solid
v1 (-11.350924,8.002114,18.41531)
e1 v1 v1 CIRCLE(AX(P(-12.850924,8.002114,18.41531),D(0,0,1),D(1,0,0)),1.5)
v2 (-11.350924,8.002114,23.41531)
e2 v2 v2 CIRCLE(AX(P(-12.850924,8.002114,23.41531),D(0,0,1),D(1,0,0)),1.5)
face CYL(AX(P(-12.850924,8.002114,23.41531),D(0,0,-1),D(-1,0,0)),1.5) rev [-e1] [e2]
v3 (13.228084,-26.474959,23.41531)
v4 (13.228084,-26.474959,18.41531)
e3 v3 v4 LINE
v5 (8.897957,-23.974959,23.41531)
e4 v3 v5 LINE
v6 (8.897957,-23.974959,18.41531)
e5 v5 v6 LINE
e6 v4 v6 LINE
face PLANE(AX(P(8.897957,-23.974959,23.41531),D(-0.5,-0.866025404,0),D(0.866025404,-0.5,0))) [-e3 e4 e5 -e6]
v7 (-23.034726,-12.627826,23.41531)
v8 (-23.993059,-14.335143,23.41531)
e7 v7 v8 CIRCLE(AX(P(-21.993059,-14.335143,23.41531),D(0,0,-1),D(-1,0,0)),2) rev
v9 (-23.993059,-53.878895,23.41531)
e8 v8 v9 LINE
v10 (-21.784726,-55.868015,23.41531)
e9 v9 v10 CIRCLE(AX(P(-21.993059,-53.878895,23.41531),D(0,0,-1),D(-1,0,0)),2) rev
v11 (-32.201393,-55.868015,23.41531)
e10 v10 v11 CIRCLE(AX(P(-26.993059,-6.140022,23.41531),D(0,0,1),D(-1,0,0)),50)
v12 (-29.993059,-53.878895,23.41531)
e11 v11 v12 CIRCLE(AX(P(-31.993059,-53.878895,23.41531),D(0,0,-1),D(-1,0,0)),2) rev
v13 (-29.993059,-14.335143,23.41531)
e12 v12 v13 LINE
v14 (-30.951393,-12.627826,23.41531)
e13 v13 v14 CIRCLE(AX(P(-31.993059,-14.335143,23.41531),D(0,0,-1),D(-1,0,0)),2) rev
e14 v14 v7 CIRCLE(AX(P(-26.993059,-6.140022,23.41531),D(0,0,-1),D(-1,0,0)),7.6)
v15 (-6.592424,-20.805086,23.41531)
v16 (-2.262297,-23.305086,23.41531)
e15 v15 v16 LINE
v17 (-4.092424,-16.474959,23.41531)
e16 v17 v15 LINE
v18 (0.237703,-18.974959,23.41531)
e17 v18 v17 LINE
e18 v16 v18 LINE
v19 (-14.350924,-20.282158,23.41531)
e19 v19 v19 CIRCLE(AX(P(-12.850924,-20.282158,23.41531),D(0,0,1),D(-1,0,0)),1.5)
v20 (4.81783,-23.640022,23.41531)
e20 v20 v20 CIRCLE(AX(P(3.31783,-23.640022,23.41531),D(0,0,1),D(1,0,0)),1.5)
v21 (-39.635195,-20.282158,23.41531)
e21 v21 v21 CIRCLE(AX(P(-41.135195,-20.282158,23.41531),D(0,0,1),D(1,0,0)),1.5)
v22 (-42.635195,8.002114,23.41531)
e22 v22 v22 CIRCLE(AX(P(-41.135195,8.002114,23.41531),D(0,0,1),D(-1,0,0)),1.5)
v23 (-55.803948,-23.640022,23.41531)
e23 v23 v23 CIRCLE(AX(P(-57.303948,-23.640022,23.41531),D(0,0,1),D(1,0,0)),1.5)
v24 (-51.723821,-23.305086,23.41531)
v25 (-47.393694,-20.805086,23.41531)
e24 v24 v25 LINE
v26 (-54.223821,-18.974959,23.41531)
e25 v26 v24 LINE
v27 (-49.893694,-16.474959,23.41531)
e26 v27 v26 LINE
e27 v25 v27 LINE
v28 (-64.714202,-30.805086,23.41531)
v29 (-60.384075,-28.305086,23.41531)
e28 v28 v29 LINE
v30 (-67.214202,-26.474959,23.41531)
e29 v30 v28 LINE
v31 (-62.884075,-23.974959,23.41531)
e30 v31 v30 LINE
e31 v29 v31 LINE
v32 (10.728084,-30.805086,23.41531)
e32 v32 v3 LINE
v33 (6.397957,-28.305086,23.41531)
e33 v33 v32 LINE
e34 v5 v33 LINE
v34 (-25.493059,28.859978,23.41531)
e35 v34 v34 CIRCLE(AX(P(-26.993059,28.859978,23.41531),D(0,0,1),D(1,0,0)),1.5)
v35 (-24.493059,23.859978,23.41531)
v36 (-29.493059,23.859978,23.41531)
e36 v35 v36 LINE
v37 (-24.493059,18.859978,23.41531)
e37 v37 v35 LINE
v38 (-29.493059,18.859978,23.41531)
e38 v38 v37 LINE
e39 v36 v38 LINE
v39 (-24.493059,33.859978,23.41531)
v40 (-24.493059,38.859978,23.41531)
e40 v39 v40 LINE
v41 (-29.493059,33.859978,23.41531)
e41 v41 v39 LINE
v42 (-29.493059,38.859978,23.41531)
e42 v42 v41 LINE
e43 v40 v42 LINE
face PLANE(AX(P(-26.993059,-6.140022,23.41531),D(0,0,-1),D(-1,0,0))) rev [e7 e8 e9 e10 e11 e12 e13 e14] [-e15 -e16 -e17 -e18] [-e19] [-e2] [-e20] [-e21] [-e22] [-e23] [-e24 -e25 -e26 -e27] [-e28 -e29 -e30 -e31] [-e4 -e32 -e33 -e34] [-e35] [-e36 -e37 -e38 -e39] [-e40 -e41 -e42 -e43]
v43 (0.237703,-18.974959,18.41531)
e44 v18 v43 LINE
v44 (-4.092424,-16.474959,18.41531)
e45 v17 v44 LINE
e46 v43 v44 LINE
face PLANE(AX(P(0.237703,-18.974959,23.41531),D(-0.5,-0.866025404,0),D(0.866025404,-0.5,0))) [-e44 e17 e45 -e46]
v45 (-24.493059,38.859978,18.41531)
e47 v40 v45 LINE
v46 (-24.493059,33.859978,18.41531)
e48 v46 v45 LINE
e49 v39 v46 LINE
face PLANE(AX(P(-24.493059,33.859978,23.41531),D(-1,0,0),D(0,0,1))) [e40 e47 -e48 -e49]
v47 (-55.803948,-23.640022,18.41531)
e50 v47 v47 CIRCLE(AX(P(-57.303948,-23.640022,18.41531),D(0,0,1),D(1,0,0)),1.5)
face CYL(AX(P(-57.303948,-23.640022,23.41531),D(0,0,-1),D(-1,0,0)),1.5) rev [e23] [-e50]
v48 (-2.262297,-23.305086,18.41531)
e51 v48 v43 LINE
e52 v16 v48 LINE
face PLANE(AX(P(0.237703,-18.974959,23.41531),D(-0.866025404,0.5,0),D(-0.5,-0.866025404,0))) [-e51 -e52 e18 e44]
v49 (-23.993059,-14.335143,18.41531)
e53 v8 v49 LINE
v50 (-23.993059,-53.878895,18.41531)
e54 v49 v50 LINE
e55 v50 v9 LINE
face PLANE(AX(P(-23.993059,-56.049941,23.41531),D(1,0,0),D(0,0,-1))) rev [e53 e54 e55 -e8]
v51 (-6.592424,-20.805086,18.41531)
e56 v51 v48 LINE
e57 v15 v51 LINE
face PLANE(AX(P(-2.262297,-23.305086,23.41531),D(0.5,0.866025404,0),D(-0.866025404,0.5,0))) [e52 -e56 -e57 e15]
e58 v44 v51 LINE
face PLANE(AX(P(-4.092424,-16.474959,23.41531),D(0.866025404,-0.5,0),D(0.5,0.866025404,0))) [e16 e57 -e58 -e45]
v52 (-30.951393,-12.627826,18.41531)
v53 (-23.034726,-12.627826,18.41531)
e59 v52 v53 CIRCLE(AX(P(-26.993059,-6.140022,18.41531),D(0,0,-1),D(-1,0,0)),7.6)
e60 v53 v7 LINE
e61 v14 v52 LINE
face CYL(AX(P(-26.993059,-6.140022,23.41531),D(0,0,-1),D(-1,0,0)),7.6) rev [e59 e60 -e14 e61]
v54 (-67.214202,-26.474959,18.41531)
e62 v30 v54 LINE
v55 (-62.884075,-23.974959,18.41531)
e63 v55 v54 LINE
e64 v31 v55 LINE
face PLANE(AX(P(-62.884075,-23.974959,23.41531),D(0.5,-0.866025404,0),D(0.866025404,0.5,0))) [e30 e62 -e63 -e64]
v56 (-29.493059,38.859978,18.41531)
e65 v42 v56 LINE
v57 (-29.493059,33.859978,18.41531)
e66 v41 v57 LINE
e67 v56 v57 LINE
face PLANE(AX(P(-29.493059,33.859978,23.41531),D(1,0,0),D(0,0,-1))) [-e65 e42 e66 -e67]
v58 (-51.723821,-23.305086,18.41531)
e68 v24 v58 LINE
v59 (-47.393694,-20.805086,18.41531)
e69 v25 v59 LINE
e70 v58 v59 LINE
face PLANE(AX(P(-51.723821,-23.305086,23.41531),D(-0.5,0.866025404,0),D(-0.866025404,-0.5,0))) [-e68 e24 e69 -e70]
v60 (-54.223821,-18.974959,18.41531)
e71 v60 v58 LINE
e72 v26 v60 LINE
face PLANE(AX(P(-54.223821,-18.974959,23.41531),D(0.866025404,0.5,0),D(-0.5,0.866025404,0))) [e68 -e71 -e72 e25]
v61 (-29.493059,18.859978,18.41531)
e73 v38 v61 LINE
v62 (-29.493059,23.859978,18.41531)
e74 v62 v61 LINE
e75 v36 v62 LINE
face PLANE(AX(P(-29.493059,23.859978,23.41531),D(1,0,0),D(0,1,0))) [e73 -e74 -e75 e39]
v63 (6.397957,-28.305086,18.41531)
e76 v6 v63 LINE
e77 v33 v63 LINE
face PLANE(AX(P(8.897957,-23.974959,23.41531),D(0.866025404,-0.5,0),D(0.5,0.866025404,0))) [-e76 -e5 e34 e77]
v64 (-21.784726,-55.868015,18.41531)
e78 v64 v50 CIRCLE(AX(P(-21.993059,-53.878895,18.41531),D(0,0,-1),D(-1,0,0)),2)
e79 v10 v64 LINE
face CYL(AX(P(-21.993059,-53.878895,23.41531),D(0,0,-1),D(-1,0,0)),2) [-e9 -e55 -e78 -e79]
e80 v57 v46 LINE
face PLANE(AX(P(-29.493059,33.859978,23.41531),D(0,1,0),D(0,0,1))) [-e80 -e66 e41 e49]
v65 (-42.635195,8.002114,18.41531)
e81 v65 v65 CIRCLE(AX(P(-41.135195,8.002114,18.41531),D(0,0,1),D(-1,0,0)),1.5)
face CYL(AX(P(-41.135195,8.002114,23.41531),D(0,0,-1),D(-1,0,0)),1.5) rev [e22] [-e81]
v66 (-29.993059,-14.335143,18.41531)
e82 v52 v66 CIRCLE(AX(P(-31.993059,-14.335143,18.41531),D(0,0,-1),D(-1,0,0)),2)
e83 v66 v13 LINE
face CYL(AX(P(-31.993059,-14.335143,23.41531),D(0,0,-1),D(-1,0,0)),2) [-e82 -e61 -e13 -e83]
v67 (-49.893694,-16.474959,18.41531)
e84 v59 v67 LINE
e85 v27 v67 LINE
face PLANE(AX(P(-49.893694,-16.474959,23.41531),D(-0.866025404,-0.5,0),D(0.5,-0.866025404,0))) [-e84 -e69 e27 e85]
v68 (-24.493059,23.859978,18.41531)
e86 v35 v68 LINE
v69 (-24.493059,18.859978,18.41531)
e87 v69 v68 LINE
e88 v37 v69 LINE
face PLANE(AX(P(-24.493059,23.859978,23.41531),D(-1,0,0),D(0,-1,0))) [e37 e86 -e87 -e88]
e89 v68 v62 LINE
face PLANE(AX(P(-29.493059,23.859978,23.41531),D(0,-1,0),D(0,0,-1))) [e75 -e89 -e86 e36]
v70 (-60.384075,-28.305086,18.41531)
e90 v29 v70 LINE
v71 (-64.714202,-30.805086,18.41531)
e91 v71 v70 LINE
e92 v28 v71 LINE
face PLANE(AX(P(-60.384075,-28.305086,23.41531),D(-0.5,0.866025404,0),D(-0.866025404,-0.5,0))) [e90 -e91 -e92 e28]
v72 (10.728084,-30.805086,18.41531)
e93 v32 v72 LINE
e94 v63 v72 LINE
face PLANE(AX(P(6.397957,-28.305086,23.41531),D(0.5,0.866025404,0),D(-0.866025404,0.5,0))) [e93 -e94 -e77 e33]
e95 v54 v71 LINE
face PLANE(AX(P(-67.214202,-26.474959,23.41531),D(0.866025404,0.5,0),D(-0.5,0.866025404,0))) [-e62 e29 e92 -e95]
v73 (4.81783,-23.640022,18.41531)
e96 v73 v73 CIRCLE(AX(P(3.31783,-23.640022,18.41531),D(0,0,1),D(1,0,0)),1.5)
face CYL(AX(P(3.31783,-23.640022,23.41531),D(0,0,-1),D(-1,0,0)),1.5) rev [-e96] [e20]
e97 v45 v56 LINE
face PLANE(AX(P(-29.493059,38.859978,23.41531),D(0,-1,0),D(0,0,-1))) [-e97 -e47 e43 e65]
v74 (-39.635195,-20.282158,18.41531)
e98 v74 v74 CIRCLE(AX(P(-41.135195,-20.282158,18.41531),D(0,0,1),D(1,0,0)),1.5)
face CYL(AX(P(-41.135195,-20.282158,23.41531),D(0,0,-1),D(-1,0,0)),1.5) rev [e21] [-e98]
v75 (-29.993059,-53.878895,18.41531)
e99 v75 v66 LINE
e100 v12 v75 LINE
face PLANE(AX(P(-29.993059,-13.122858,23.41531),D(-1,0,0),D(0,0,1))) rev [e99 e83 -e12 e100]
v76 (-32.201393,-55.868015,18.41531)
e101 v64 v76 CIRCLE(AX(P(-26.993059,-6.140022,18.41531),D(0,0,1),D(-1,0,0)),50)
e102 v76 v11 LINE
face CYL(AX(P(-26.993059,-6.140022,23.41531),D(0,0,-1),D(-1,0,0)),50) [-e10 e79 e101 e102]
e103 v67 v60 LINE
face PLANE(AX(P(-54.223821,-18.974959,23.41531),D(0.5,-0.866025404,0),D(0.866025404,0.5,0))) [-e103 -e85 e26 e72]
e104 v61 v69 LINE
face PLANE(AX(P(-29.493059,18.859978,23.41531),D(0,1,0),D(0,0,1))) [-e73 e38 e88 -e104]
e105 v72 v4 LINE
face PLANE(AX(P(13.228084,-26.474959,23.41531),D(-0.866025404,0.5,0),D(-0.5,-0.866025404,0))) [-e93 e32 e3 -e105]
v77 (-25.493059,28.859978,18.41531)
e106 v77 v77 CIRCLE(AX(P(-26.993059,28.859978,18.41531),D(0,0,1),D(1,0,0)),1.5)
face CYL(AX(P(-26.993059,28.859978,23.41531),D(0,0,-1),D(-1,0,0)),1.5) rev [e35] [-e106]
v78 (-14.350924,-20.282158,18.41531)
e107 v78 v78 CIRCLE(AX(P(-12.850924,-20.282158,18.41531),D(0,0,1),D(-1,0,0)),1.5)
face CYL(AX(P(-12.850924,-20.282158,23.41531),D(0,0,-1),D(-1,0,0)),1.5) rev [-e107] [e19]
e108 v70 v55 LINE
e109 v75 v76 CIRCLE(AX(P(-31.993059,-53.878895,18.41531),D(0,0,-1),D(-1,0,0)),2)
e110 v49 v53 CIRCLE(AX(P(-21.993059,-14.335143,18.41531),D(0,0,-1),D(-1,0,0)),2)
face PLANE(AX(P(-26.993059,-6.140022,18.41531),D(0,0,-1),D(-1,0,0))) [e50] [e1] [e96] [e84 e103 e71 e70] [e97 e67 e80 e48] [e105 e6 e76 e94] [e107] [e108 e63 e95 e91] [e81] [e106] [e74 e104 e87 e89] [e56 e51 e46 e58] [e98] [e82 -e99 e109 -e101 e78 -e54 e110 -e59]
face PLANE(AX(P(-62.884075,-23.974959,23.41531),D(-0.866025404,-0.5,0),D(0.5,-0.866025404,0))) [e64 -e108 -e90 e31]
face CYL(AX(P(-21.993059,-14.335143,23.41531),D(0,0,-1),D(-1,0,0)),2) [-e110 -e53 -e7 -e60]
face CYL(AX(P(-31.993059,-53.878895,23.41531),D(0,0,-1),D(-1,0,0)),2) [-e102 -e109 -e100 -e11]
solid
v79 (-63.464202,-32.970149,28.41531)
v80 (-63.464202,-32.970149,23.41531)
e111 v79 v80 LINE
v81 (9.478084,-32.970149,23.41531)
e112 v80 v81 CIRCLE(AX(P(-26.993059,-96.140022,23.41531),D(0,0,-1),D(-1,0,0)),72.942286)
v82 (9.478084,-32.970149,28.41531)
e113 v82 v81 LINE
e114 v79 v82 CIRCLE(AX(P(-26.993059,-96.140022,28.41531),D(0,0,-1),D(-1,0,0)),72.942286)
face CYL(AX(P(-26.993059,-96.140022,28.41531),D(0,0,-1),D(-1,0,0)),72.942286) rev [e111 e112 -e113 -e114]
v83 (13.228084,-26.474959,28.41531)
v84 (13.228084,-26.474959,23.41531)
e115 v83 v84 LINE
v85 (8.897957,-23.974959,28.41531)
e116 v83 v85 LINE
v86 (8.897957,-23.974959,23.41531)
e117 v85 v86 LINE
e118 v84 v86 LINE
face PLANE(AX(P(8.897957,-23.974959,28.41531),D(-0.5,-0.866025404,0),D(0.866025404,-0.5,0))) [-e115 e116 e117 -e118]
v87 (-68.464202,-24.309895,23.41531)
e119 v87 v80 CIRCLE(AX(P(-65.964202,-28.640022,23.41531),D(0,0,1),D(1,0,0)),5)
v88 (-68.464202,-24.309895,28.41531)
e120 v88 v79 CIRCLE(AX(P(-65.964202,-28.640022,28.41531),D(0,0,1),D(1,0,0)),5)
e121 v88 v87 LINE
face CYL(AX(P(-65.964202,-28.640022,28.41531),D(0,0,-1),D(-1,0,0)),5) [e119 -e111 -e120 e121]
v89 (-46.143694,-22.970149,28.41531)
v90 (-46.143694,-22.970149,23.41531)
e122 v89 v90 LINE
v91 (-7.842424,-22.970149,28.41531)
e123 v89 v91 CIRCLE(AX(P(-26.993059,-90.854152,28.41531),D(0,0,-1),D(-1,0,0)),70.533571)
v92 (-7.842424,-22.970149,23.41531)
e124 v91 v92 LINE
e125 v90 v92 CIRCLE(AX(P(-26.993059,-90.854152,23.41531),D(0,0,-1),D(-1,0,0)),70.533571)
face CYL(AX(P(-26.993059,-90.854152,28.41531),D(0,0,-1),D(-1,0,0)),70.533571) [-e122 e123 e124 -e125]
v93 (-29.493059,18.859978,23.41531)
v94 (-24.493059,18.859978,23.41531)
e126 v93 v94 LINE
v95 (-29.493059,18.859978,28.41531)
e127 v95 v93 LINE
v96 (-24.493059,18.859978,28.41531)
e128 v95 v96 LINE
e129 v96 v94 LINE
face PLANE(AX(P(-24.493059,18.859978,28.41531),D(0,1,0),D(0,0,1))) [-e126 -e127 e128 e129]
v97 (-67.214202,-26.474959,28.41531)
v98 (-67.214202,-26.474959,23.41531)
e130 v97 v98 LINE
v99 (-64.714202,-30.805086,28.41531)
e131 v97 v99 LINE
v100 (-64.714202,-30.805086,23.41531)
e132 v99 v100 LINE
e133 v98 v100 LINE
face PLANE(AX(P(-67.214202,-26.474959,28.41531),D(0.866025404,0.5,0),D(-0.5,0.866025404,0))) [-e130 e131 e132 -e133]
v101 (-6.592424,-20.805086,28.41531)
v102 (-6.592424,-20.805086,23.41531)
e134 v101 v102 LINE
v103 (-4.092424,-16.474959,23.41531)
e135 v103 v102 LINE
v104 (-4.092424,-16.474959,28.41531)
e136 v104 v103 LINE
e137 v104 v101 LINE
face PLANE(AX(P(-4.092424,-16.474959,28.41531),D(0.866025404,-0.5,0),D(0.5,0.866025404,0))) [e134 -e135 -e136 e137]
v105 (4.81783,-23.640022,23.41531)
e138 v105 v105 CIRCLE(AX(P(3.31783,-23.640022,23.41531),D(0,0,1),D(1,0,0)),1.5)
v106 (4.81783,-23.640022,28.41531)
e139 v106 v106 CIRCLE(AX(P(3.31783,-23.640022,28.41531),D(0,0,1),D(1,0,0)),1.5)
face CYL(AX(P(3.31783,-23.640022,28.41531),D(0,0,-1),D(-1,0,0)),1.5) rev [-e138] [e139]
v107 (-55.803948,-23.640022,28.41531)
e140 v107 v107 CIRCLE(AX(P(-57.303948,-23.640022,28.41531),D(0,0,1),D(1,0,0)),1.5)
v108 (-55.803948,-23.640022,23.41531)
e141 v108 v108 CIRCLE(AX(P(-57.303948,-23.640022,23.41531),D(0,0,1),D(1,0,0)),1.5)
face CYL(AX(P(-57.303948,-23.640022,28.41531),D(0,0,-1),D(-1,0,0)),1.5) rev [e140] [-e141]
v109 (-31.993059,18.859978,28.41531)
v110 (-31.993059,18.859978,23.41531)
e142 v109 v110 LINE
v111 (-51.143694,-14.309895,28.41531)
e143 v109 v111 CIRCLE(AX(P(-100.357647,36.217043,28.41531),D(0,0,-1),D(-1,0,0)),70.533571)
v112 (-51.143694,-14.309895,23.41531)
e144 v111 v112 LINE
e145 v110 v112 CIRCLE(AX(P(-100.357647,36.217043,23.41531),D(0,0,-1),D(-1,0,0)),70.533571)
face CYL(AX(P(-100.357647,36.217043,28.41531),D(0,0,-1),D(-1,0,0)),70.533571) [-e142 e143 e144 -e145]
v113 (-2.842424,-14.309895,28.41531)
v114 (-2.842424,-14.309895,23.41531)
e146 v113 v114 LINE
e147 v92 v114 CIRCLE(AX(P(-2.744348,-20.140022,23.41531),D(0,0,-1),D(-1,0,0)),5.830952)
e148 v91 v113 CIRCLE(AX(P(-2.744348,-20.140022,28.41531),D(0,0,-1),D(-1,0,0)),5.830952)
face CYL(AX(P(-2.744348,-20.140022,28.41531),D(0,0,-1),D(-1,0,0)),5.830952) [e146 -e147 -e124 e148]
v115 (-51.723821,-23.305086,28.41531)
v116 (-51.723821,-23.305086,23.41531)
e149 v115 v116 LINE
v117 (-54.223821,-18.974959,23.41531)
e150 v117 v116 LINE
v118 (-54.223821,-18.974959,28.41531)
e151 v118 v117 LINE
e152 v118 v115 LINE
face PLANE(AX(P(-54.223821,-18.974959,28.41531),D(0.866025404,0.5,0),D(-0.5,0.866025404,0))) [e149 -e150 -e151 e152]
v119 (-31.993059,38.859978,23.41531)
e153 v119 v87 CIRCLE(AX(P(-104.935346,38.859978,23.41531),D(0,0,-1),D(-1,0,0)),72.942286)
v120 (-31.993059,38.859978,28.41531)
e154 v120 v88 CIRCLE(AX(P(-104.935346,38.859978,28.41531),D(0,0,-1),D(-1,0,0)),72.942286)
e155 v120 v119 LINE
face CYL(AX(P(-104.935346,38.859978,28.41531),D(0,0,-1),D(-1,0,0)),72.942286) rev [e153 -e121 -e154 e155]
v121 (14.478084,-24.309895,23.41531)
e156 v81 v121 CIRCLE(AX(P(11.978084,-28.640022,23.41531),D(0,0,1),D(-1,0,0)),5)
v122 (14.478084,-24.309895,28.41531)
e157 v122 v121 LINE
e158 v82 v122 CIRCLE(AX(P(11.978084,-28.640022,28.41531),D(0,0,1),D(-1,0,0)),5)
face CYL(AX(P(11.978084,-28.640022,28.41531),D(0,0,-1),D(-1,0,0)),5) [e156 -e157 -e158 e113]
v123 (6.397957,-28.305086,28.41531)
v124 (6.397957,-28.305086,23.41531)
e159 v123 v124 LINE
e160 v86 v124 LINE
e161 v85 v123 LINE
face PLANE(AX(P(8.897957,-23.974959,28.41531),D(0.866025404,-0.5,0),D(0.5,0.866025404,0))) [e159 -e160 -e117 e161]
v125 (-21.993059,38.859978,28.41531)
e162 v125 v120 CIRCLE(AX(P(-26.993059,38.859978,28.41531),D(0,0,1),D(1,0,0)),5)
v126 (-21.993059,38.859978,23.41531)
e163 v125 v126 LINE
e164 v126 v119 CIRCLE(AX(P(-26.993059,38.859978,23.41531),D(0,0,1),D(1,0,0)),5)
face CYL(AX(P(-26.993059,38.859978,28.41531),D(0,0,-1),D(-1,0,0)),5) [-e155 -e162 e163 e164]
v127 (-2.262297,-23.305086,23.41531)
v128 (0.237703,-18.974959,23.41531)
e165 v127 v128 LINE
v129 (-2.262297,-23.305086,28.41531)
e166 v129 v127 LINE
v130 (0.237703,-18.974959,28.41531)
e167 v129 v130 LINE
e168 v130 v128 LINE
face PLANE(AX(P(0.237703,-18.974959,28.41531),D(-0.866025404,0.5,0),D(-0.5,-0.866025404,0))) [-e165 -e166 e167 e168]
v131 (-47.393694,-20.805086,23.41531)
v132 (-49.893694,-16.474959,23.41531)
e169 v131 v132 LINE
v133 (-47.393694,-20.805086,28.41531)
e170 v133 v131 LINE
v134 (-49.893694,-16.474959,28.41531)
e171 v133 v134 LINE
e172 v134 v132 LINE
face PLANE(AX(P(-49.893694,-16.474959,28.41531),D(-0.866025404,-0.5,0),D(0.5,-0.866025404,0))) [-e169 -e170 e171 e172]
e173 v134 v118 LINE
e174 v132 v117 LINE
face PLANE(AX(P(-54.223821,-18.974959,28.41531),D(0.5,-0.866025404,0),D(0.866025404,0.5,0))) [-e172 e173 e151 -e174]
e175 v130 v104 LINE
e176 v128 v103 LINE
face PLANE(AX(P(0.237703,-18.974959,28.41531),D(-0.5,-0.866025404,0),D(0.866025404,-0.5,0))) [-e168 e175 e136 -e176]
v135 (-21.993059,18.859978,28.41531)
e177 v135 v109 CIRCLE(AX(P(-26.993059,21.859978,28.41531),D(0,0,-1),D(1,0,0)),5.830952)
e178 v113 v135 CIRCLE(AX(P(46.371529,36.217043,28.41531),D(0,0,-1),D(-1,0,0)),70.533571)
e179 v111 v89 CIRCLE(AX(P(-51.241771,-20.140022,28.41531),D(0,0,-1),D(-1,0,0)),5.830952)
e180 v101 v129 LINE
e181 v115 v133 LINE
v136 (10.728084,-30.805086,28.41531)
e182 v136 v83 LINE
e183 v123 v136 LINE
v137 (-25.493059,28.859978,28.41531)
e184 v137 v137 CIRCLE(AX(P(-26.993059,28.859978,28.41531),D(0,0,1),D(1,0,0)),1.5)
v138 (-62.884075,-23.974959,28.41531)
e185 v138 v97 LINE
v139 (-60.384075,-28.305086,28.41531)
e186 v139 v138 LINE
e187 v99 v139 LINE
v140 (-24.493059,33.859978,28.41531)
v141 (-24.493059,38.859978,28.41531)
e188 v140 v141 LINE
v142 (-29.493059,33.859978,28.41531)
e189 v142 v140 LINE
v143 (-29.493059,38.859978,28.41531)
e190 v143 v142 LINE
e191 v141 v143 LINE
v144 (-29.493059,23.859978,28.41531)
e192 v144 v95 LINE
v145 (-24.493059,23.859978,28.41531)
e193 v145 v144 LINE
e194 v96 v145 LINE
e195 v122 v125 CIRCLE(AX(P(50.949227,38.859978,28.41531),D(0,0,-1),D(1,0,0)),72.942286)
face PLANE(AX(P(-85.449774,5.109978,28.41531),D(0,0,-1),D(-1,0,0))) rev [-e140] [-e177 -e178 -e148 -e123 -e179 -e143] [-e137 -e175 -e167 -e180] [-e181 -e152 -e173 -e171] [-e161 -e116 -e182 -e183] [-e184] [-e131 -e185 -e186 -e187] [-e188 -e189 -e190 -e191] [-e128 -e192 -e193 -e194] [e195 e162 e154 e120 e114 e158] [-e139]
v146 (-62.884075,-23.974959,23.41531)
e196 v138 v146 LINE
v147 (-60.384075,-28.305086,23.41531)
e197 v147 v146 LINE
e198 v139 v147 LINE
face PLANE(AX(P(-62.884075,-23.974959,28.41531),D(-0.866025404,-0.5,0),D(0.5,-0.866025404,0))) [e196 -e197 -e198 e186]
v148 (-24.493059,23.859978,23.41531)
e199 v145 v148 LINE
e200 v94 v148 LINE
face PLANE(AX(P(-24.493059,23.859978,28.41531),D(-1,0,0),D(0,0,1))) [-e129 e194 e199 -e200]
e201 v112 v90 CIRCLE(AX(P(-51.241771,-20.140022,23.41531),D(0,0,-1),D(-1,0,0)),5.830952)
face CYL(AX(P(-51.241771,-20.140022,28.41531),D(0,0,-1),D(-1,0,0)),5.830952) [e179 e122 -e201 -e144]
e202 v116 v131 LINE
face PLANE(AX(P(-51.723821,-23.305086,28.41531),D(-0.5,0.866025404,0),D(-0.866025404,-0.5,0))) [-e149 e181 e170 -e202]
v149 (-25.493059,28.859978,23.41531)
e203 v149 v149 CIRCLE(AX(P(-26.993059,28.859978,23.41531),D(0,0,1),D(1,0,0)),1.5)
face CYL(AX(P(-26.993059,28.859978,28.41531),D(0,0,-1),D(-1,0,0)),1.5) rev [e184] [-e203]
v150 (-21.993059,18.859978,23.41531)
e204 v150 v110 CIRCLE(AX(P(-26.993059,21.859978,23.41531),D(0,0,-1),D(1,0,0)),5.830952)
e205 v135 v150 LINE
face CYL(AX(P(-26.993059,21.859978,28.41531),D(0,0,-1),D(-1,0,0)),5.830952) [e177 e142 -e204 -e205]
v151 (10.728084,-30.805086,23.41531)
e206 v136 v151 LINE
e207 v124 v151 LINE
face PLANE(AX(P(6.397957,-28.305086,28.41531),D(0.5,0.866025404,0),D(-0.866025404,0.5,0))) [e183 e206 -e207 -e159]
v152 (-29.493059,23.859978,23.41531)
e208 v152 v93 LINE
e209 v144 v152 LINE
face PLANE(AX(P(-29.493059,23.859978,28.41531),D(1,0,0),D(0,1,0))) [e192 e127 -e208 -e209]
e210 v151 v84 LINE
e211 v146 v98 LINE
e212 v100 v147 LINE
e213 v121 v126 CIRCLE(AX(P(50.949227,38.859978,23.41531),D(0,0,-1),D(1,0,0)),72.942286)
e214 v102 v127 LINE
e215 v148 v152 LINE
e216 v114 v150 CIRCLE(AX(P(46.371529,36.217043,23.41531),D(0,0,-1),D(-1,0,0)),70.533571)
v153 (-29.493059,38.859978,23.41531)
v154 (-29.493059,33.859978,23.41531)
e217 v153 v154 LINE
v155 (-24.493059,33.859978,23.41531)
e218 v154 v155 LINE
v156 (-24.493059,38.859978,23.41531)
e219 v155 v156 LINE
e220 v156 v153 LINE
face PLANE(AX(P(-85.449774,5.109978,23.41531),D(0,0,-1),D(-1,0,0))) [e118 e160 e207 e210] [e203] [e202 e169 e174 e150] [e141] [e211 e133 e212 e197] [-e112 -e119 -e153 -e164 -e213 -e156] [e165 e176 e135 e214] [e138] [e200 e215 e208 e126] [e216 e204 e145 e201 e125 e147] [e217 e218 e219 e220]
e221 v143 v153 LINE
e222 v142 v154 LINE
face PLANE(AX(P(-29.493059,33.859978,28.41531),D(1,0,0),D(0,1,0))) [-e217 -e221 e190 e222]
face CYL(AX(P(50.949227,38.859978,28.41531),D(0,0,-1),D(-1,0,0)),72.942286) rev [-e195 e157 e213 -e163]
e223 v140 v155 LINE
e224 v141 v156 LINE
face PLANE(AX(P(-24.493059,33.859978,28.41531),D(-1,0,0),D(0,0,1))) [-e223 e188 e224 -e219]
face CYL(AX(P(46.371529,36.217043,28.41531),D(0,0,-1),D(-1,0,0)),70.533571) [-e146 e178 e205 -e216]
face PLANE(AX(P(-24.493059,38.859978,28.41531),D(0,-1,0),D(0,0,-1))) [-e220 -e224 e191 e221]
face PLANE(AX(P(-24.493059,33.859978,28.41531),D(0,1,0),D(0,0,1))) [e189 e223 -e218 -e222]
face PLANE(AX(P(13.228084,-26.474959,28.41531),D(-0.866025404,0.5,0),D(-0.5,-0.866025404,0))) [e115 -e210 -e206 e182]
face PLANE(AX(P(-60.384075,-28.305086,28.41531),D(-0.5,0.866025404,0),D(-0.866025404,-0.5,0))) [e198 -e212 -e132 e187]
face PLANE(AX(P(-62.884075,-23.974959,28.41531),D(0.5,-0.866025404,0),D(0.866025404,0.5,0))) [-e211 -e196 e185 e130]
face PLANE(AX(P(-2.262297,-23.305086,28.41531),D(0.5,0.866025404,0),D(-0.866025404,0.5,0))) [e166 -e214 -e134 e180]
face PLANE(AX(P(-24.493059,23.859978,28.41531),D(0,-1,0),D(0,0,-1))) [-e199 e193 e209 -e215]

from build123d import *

# Parameters (mm, degrees)
BODY_MOVE_COPY2_START     = 18.4153099
BODY_MOVE_COPY2_OUTLINE_R = 1.5
BODY_MOVE_COPY2_OUTLINE_W = 5
BODY_MOVE_COPY2_OUTLINE_H = 5
BODY_MOVE_COPY2_DEPTH     = 5
SKETCH2_R                 = 1.5
SKETCH2_W                 = 5
SKETCH2_H                 = 5
BOSS_EXTRUDE1_DEPTH       = 5


# Read off the part's stored shape, not the designer's step: Body-Move/Copy2
with BuildPart() as part:
    # Body-Move/Copy2 outline → Body-Move/Copy2 (new body)
    with BuildSketch(Plane.XY.offset(BODY_MOVE_COPY2_START)):
        with BuildLine():
            ThreePointArc((-29.993059319, -14.335142591), (-30.249021858, -13.35619758), (-30.951392653, -12.62782582))
            ThreePointArc((-30.951392653, -12.62782582), (-26.993059319, 1.459977909), (-23.034725986, -12.62782582))
            ThreePointArc((-23.034725986, -12.62782582), (-23.737096781, -13.35619758), (-23.993059319, -14.335142591))
            Line((-23.993059319, -14.335142591), (-23.993059319, -53.87889514))
            ThreePointArc((-23.993059319, -53.87889514), (-23.331590853, -55.364941349), (-21.784725986, -55.868014851))
            ThreePointArc((-21.784725986, -55.868014851), (-26.993059319, 43.859977909), (-32.201392653, -55.868014851))
            ThreePointArc((-32.201392653, -55.868014851), (-30.654527786, -55.364941349), (-29.993059319, -53.87889514))
            Line((-29.993059319, -53.87889514), (-29.993059319, -14.335142591))
        make_face()
        Polygon((-67.21420249, -26.474958582), (-62.884075471, -23.974958582), (-60.384075471, -28.305085601), (-64.71420249, -30.805085601), align=None, mode=Mode.SUBTRACT)
        with Locations((-57.303948452, -23.640022091)):
            Circle(BODY_MOVE_COPY2_OUTLINE_R, mode=Mode.SUBTRACT)
        Polygon((-47.393694414, -20.805085601), (-51.723821433, -23.305085601), (-54.223821433, -18.974958582), (-49.893694414, -16.474958582), align=None, mode=Mode.SUBTRACT)
        with Locations((-41.135194943, -20.282157715)):
            Circle(BODY_MOVE_COPY2_OUTLINE_R, mode=Mode.SUBTRACT)
        with Locations((-12.850923696, -20.282157715)):
            Circle(BODY_MOVE_COPY2_OUTLINE_R, mode=Mode.SUBTRACT)
        Polygon((-4.092424225, -16.474958582), (0.237702794, -18.974958582), (-2.262297206, -23.305085601), (-6.592424225, -20.805085601), align=None, mode=Mode.SUBTRACT)
        Polygon((10.728083851, -30.805085601), (6.397956832, -28.305085601), (8.897956832, -23.974958582), (13.228083851, -26.474958582), align=None, mode=Mode.SUBTRACT)
        with Locations((3.317829813, -23.640022091)):
            Circle(BODY_MOVE_COPY2_OUTLINE_R, mode=Mode.SUBTRACT)
        with Locations((-41.135194943, 8.002113533)):
            Circle(BODY_MOVE_COPY2_OUTLINE_R, mode=Mode.SUBTRACT)
        with Locations((-12.850923696, 8.002113533)):
            Circle(BODY_MOVE_COPY2_OUTLINE_R, mode=Mode.SUBTRACT)
        with Locations((-26.993059319, 21.359977909)):
            Rectangle(BODY_MOVE_COPY2_OUTLINE_W, BODY_MOVE_COPY2_OUTLINE_H, mode=Mode.SUBTRACT)
        with Locations((-26.993059319, 28.859977909)):
            Circle(BODY_MOVE_COPY2_OUTLINE_R, mode=Mode.SUBTRACT)
        with Locations((-26.993059319, 36.359977909)):
            Rectangle(BODY_MOVE_COPY2_OUTLINE_W, BODY_MOVE_COPY2_OUTLINE_H, mode=Mode.SUBTRACT)
    extrude(amount=BODY_MOVE_COPY2_DEPTH)


with BuildPart() as body_2:
    # Sketch2 → Boss-Extrude1 (new body)
    with BuildSketch(Plane.XY.offset(23.4153099)):
        with BuildLine():
            ThreePointArc((-68.46420249, -24.309895072), (-70.294329509, -31.140022091), (-63.46420249, -32.97014911))
            ThreePointArc((-63.46420249, -32.97014911), (-26.993059319, -23.197735751), (9.478083851, -32.97014911))
            ThreePointArc((9.478083851, -32.97014911), (16.30821087, -31.140022091), (14.478083851, -24.309895072))
            ThreePointArc((14.478083851, -24.309895072), (-12.22064596, 2.388834739), (-21.993059319, 38.859977909))
            ThreePointArc((-21.993059319, 38.859977909), (-26.993059319, 43.859977909), (-31.993059319, 38.859977909))
            ThreePointArc((-31.993059319, 38.859977909), (-41.765472679, 2.388834739), (-68.46420249, -24.309895072))
        make_face()
        with Locations((-26.993059319, 28.859977909)):
            Circle(SKETCH2_R, mode=Mode.SUBTRACT)
        with Locations((3.317829813, -23.640022091)):
            Circle(SKETCH2_R, mode=Mode.SUBTRACT)
        with Locations((-57.303948452, -23.640022091)):
            Circle(SKETCH2_R, mode=Mode.SUBTRACT)
        with BuildLine():
            ThreePointArc((-46.143694414, -22.97014911), (-26.993059319, -20.320580734), (-7.842424225, -22.97014911))
            ThreePointArc((-7.842424225, -22.97014911), (-7.794100483, -17.224546144), (-2.842424225, -14.309895072))
            ThreePointArc((-2.842424225, -14.309895072), (-14.712335295, 0.95025723), (-21.993059319, 18.859977909))
            ThreePointArc((-21.993059319, 18.859977909), (-26.993059319, 16.029026014), (-31.993059319, 18.859977909))
            ThreePointArc((-31.993059319, 18.859977909), (-39.273783344, 0.95025723), (-51.143694414, -14.309895072))
            ThreePointArc((-51.143694414, -14.309895072), (-46.192018156, -17.224546144), (-46.143694414, -22.97014911))
        make_face(mode=Mode.SUBTRACT)
        with Locations((-26.993059319, 36.359977909)):
            Rectangle(SKETCH2_W, SKETCH2_H, mode=Mode.SUBTRACT)
        with Locations((-26.993059319, 21.359977909)):
            Rectangle(SKETCH2_W, SKETCH2_H, mode=Mode.SUBTRACT)
        Polygon((0.237702794, -18.974958582), (-4.092424225, -16.474958582), (-6.592424225, -20.805085601), (-2.262297206, -23.305085601), align=None, mode=Mode.SUBTRACT)
        Polygon((8.897956832, -23.974958582), (13.228083851, -26.474958582), (10.728083851, -30.805085601), (6.397956832, -28.305085601), align=None, mode=Mode.SUBTRACT)
        Polygon((-62.884075471, -23.974958582), (-67.21420249, -26.474958582), (-64.71420249, -30.805085601), (-60.384075471, -28.305085601), align=None, mode=Mode.SUBTRACT)
        Polygon((-54.223821433, -18.974958582), (-49.893694414, -16.474958582), (-47.393694414, -20.805085601), (-51.723821433, -23.305085601), align=None, mode=Mode.SUBTRACT)
    extrude(amount=BOSS_EXTRUDE1_DEPTH)


solid = Compound([part.part, body_2.part])
